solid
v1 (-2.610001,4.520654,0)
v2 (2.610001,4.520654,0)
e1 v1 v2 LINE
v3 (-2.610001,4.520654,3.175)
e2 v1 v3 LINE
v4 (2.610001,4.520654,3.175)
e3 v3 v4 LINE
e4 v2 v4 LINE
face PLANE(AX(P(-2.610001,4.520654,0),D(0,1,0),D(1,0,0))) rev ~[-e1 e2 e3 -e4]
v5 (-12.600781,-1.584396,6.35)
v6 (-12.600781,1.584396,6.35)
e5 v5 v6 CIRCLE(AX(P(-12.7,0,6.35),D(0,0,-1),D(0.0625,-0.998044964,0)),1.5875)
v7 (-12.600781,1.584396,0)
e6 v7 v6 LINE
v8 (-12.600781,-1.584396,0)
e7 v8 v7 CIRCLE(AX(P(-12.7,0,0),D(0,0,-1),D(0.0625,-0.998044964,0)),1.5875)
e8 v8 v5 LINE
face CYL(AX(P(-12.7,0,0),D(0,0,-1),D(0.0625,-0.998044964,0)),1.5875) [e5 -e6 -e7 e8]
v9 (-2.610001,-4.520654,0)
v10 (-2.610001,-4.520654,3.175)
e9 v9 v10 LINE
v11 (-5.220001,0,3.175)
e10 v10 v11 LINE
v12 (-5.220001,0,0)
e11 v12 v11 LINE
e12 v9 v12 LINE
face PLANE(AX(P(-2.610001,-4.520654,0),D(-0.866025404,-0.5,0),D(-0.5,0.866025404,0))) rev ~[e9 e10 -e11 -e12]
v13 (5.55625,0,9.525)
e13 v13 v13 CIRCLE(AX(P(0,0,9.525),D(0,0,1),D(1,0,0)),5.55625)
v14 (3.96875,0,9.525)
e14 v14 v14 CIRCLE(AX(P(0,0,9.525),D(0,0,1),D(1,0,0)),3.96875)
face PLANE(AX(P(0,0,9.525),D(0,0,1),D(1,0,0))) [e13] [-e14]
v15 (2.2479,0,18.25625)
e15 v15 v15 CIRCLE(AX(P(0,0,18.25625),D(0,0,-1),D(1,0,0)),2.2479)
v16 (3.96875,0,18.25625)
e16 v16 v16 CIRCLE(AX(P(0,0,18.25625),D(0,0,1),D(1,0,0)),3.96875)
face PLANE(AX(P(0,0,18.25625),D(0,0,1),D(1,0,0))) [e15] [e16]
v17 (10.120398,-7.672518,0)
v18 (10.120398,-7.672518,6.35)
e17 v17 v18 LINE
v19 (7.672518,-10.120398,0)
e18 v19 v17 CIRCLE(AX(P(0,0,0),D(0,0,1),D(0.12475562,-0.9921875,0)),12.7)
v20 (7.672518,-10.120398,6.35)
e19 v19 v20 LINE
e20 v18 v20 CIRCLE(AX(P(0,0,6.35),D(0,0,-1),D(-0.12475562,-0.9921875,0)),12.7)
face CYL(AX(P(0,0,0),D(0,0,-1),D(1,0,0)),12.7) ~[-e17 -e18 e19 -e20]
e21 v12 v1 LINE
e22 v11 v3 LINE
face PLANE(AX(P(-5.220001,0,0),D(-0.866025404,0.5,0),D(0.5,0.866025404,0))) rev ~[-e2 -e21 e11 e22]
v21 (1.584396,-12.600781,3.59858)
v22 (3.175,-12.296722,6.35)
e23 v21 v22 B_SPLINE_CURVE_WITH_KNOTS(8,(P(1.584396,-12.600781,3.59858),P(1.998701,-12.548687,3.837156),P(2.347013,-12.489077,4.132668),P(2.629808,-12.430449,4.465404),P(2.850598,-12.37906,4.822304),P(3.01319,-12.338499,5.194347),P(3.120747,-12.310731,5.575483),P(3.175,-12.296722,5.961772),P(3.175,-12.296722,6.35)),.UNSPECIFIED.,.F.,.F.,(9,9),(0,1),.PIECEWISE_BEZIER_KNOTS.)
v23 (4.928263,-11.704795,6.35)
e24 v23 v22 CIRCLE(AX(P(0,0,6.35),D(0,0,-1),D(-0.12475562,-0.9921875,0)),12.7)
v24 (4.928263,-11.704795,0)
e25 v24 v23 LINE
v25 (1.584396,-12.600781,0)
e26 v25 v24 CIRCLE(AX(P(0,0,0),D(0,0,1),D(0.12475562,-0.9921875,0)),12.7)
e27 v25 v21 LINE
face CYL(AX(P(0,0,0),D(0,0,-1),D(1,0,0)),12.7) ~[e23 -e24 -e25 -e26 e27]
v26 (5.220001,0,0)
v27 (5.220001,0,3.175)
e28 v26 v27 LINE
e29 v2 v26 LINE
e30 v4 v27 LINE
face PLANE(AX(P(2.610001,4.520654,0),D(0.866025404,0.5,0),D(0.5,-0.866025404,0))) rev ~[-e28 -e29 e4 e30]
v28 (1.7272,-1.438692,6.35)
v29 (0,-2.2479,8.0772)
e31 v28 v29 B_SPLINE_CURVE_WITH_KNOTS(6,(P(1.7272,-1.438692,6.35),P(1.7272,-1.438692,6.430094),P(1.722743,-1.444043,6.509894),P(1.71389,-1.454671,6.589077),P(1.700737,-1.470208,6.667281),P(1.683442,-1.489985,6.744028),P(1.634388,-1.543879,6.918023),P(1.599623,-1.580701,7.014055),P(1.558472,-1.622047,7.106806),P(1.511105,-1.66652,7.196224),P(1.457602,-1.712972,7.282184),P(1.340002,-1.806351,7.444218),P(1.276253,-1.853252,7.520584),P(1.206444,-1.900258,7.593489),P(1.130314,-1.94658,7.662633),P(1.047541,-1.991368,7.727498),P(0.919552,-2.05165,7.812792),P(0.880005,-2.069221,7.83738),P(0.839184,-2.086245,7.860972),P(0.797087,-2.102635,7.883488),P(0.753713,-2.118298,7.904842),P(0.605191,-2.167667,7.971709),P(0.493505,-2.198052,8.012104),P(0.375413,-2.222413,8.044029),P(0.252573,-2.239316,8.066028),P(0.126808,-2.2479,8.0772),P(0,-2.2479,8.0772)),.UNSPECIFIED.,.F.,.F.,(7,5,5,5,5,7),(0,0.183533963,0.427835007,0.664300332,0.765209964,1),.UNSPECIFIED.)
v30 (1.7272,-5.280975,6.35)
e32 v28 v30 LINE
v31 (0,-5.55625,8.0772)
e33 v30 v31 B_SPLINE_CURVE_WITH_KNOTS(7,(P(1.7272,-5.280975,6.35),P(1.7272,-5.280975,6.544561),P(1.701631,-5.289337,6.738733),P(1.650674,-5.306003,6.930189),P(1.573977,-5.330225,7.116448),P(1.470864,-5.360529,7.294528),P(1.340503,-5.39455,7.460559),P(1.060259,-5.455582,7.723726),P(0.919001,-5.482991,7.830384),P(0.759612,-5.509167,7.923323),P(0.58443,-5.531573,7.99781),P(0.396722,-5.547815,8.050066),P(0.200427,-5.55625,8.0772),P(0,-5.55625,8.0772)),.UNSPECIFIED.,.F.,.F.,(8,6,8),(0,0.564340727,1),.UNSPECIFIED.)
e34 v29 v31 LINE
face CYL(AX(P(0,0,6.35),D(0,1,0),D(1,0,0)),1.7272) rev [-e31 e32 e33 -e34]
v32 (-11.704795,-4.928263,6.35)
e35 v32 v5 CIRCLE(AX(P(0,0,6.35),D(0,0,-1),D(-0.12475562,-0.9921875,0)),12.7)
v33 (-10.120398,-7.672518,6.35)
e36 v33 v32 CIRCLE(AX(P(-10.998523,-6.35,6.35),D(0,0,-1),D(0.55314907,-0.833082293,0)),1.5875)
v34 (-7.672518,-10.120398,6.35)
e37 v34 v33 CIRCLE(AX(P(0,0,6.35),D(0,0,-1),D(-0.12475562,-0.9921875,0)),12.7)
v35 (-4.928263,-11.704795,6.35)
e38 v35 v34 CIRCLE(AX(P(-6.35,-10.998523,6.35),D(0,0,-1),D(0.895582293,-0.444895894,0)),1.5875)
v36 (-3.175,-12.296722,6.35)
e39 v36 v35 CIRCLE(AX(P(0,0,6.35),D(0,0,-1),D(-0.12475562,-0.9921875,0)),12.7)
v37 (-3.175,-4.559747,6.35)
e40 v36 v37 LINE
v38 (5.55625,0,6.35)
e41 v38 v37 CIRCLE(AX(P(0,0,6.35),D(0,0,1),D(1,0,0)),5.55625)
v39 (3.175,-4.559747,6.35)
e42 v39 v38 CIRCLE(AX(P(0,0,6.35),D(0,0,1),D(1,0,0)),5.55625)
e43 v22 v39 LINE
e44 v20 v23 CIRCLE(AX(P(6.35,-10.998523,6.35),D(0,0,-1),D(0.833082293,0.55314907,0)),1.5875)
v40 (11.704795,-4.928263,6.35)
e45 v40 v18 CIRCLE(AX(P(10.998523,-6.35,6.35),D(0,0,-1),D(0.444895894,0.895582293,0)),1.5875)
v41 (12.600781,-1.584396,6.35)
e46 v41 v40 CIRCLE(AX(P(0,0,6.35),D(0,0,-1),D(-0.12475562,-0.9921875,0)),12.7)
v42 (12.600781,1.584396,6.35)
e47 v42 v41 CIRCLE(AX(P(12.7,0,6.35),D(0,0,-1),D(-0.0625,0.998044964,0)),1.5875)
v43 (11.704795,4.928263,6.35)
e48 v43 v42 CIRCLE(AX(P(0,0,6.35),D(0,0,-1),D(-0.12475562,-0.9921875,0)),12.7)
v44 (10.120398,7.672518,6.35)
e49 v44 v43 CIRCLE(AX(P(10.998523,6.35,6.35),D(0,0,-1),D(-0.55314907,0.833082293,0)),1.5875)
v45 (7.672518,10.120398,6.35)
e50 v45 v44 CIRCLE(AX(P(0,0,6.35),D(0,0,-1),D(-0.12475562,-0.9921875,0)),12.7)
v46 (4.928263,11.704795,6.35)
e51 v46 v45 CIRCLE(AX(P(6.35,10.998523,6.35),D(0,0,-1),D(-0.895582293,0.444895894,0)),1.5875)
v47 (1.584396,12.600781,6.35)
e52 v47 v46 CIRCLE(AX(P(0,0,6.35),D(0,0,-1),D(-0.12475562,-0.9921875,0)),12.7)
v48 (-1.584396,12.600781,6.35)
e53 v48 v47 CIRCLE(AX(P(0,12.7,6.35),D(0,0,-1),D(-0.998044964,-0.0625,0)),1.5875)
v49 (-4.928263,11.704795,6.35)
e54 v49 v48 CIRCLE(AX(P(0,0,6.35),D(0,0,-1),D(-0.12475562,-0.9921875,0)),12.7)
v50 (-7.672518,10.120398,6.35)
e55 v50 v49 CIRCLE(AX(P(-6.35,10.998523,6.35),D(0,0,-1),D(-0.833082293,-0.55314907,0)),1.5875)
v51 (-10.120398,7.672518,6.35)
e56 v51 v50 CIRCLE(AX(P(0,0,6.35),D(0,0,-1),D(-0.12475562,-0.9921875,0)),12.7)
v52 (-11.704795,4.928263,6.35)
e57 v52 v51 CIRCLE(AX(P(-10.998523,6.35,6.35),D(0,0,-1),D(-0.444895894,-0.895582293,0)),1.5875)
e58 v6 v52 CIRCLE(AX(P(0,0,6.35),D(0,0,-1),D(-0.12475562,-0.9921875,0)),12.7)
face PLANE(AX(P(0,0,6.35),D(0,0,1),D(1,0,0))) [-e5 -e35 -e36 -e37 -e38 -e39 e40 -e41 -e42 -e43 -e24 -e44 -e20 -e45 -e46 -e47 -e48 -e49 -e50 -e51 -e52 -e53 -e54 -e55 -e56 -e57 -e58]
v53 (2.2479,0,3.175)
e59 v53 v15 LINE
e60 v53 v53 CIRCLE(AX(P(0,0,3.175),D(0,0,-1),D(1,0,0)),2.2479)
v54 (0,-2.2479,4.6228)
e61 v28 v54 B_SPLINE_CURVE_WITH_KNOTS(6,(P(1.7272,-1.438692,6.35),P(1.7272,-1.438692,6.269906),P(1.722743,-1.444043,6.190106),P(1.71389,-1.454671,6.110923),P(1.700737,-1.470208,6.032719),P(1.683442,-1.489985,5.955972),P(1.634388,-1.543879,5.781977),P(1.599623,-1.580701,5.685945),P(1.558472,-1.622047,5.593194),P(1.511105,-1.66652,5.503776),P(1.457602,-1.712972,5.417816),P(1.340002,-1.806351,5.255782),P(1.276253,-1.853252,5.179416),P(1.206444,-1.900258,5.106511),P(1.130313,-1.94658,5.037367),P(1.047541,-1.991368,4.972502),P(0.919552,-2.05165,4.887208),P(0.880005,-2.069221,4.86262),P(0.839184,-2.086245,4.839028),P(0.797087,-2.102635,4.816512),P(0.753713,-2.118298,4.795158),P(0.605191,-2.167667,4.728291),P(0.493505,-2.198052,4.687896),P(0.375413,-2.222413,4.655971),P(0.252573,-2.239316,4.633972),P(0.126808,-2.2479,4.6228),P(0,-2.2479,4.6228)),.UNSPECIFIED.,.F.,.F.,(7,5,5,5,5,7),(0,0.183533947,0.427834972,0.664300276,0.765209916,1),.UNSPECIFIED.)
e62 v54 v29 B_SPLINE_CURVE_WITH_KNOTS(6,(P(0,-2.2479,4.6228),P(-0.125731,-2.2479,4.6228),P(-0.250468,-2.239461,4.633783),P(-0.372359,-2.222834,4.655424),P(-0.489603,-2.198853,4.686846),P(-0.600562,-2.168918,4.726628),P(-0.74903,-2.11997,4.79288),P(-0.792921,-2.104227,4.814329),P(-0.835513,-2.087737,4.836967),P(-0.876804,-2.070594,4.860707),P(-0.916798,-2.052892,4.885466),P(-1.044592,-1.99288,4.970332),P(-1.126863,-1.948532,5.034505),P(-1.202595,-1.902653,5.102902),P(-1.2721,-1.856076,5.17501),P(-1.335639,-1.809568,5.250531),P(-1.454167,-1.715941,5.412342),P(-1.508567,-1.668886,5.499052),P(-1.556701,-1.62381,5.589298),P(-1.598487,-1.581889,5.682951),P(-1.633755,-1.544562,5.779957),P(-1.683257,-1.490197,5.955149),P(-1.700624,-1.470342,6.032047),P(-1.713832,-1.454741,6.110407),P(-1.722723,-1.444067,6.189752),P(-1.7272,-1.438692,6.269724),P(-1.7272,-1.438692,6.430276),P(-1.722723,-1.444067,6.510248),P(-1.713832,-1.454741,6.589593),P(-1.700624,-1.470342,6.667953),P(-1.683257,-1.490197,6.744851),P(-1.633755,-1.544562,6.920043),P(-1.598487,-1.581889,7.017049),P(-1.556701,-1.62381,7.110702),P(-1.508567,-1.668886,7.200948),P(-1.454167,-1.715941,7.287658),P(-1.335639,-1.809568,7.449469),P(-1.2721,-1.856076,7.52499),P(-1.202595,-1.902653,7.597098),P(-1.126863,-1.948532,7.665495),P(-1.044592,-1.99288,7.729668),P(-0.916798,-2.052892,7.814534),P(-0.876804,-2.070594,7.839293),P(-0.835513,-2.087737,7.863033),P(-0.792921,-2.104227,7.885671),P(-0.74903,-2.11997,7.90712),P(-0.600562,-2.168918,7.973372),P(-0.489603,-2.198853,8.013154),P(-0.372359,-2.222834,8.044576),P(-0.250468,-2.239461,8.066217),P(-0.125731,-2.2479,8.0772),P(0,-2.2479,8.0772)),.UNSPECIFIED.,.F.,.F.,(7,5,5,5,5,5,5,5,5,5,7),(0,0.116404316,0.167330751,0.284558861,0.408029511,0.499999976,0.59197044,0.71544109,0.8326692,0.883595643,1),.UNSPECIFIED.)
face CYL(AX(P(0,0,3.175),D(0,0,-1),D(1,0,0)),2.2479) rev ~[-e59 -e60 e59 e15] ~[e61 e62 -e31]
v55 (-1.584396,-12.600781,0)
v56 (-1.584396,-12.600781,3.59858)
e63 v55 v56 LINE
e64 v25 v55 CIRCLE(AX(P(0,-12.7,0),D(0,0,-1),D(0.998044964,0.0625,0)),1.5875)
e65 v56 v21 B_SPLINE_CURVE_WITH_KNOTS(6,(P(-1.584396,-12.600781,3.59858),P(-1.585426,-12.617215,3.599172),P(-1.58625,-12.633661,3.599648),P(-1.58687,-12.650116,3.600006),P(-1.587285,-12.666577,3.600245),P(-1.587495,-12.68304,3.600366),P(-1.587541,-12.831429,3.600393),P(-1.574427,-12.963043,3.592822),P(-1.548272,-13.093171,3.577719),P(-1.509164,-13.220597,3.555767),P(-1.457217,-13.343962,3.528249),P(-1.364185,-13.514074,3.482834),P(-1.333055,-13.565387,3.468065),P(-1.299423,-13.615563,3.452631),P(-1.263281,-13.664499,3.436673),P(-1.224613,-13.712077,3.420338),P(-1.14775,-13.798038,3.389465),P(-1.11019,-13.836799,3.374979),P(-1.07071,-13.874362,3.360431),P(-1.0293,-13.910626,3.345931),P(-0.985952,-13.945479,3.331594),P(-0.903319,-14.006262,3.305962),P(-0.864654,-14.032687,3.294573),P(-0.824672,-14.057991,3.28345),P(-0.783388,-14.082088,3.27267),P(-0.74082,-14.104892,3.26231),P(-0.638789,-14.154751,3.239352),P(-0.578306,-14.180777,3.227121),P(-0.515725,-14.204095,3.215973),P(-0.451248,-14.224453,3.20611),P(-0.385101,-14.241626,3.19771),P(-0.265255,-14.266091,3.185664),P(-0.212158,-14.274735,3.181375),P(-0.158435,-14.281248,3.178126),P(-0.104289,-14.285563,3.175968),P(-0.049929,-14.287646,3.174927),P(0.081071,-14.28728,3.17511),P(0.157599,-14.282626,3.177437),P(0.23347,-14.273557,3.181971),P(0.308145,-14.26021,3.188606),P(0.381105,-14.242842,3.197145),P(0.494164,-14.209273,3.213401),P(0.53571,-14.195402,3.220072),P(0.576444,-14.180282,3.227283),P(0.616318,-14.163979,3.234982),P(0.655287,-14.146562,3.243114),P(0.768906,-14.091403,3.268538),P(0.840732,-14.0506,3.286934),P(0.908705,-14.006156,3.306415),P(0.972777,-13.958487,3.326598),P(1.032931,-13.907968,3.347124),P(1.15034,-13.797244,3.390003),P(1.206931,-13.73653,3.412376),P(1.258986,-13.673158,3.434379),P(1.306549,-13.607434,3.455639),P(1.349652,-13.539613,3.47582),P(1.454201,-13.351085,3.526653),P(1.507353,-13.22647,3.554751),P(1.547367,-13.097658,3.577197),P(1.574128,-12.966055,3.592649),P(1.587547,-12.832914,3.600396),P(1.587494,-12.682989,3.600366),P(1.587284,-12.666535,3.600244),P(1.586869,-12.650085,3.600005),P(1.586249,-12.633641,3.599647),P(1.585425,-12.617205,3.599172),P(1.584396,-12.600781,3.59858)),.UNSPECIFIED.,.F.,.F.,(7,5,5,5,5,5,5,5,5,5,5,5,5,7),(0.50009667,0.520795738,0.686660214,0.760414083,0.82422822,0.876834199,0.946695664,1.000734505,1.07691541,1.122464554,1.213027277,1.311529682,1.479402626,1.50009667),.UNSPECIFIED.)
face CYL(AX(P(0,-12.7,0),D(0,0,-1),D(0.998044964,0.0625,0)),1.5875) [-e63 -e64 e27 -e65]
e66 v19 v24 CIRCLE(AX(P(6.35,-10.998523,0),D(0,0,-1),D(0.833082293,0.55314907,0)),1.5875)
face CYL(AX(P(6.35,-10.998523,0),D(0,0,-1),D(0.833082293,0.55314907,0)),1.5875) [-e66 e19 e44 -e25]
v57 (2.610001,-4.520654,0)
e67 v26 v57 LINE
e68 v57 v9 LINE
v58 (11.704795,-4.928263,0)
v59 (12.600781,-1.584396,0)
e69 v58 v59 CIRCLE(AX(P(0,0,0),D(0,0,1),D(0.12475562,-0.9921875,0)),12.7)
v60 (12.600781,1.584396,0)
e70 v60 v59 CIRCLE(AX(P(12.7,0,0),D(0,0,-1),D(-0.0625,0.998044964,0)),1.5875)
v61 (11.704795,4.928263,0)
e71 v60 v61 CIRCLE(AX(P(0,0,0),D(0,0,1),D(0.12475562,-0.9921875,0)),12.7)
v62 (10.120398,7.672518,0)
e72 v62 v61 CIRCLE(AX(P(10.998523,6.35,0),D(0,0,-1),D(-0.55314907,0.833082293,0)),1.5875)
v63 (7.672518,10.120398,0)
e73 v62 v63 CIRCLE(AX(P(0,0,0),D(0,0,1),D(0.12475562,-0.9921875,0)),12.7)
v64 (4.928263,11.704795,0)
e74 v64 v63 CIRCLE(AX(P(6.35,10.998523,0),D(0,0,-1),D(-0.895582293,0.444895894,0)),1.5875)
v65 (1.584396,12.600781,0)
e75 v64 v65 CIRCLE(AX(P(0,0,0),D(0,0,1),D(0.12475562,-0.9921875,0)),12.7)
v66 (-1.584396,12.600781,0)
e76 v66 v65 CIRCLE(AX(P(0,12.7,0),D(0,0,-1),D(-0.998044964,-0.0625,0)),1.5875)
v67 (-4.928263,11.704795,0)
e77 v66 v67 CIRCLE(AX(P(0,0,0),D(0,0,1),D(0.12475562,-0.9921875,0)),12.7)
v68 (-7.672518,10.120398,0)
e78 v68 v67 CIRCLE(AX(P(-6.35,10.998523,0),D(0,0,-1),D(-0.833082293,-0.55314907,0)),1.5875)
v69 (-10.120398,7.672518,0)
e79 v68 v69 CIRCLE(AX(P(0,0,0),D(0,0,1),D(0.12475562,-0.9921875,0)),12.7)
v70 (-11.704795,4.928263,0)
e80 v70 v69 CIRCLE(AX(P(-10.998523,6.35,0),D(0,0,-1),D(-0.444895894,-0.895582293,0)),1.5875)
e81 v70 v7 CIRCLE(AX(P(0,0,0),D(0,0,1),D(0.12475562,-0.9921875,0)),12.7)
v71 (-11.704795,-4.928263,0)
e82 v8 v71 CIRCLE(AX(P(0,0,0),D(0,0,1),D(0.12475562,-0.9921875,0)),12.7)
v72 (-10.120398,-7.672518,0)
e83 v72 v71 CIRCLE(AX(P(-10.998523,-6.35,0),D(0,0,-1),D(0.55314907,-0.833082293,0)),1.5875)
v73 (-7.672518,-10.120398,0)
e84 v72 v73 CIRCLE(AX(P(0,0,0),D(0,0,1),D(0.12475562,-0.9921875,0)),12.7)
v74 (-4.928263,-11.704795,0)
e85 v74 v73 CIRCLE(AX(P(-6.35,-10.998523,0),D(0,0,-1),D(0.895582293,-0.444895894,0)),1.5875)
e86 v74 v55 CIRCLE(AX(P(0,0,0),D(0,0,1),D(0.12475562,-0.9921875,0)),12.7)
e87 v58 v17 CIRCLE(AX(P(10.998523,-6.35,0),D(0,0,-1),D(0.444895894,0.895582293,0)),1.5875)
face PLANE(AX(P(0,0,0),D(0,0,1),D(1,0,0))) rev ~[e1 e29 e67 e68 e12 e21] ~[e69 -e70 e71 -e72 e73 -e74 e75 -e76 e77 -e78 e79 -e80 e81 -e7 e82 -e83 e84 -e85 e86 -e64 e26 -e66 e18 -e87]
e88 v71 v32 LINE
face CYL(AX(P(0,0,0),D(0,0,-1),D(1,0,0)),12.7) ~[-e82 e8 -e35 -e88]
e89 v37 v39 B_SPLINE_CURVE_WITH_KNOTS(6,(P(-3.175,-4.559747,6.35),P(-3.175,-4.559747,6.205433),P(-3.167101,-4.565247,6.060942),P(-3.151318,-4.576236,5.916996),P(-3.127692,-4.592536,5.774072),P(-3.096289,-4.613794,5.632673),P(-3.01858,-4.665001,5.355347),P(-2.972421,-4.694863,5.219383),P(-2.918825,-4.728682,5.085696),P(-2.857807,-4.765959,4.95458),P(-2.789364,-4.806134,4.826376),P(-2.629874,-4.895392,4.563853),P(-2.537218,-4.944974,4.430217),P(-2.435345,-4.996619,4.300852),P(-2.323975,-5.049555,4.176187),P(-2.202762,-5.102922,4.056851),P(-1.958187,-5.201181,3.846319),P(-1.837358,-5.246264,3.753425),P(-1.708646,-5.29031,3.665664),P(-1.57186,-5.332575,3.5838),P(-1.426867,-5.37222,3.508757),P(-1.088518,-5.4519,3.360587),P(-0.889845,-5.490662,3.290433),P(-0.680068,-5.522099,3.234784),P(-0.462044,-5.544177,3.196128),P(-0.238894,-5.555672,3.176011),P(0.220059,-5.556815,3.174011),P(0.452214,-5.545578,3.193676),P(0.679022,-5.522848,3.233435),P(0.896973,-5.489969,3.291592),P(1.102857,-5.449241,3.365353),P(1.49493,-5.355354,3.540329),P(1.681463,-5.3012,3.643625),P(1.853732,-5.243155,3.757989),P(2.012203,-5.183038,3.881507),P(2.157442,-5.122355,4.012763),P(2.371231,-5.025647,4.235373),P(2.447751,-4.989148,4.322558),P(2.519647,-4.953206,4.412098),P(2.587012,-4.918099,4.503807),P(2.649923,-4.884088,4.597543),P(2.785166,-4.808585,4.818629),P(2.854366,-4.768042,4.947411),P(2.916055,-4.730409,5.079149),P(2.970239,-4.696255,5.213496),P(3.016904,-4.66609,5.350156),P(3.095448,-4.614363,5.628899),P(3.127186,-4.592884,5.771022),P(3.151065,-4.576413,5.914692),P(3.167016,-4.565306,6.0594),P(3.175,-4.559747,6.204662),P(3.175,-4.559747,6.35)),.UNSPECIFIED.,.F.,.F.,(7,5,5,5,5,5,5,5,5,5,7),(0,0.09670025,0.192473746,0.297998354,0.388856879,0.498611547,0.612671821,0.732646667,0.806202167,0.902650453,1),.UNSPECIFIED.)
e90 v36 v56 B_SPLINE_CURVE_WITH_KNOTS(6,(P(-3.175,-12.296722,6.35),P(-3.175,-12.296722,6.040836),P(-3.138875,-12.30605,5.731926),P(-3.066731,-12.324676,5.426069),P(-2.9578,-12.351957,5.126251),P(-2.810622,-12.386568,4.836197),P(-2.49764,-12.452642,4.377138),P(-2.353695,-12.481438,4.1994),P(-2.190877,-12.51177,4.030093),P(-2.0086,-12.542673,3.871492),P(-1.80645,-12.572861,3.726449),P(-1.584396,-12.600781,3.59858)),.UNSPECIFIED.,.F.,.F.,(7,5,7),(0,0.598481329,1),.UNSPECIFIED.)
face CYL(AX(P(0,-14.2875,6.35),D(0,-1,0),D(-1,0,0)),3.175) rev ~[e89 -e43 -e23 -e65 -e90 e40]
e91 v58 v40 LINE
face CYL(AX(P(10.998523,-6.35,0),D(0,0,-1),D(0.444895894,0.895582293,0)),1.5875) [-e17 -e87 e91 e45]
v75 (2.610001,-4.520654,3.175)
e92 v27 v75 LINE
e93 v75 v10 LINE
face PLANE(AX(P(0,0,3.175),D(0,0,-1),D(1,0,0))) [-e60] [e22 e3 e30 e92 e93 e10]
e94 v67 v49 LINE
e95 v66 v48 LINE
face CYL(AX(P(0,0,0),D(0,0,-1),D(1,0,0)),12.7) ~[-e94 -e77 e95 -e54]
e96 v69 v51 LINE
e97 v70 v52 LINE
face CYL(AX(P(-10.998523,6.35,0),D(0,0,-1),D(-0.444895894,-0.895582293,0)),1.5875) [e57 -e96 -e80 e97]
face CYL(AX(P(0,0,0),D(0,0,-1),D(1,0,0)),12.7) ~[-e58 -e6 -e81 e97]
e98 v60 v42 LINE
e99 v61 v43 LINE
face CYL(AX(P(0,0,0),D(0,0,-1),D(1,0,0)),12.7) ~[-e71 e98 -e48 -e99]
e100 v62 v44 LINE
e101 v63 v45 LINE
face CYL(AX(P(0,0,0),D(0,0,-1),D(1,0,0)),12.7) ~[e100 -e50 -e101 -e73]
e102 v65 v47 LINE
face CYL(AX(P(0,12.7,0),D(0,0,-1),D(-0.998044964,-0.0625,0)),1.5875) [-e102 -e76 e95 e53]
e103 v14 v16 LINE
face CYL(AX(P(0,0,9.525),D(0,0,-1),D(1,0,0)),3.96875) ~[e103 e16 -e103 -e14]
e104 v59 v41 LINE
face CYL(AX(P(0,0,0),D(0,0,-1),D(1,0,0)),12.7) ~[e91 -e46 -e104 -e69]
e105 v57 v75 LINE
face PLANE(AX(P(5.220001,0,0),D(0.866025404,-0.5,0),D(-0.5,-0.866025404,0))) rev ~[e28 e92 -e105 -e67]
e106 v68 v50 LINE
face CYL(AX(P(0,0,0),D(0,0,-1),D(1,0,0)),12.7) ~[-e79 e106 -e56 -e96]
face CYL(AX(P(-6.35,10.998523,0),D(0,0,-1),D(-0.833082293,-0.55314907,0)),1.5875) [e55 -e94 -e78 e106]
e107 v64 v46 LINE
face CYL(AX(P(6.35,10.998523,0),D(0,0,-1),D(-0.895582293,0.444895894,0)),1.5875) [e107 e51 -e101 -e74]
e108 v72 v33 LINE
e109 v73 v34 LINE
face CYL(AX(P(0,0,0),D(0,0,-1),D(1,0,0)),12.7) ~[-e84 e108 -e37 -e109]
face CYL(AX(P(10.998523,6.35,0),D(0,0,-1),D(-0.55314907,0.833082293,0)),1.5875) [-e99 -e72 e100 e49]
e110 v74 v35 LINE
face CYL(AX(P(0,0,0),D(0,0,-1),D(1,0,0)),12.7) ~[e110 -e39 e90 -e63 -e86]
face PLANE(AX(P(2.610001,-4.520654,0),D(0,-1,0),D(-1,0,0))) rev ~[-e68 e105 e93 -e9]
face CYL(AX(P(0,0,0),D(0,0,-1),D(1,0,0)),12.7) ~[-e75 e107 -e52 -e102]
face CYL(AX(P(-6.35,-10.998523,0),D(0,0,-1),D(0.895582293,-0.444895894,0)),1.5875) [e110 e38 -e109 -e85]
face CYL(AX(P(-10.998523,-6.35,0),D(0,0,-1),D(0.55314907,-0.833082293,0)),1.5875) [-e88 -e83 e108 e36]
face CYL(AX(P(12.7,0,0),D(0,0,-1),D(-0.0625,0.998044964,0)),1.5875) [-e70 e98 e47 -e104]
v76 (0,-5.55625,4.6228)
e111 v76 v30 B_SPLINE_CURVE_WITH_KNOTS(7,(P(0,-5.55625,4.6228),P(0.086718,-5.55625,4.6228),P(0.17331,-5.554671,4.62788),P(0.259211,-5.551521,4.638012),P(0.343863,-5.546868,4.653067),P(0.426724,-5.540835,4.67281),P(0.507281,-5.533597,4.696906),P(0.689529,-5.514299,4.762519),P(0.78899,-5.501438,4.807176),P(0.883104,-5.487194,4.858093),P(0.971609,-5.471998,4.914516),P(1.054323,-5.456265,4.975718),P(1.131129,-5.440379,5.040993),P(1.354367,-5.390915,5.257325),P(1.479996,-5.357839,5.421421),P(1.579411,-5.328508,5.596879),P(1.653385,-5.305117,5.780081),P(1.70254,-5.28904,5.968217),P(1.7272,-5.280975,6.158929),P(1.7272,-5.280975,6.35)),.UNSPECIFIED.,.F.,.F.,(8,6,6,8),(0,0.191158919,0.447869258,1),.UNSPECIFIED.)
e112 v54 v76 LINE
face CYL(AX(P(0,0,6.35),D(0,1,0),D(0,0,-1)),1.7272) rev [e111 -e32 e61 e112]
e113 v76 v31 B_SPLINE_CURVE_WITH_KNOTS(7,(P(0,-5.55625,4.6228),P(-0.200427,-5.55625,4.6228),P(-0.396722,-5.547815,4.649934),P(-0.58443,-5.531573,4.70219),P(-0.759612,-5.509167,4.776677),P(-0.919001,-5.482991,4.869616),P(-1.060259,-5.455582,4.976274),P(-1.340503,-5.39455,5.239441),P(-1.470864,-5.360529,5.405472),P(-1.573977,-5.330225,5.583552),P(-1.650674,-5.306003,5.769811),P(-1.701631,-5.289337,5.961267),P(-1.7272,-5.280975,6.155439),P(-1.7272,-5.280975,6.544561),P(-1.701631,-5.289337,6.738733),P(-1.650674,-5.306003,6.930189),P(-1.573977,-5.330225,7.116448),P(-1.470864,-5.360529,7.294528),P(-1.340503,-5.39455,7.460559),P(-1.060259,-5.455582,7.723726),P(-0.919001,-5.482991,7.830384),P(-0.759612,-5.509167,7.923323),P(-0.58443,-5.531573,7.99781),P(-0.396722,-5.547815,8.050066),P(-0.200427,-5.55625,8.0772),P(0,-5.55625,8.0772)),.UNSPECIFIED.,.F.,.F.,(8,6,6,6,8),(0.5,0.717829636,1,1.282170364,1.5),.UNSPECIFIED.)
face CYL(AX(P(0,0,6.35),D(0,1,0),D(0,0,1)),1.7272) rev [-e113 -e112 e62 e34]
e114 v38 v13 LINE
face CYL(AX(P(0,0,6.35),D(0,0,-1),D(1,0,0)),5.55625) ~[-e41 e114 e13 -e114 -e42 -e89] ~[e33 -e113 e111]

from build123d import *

# Parameters (mm, degrees)
F0_R           = 12.7
F1_DEPTH       = 6.35
F3_DEPTH       = 3.175
F4_R           = 5.55625
F5_DEPTH       = 3.175
F6_R           = 3.96875
F7_DEPTH       = 8.73125
F8_R           = 2.2479
F9_DEPTH       = 15.08125
F11_DEPTH      = 6.35
F12_COUNT      = 12
F12_ANGLE      = 330
F14_END_RADIUS = 5.55625
F14_REACH      = 18.1506366107
F17_END_RADIUS = 5.55625
F17_REACH      = 35.6755158286


with BuildPart() as f1:
    # F0 (on Top) → F1 (new body)
    with BuildSketch(Plane.XY):
        Circle(F0_R)
    extrude(amount=F1_DEPTH)

    # F2 (on face) → F3 (cut)
    with BuildSketch(Plane(origin=(0, 0, 0), x_dir=(1, 0, 0), z_dir=(0, 0, -1))):
        Polygon((2.6100007461, 4.5206539), (-2.6100007461, 4.5206539), (-5.2200014922, 0), (-2.6100007461, -4.5206539), (2.6100007461, -4.5206539), (5.2200014922, 0), align=None)
    extrude(amount=-F3_DEPTH, mode=Mode.SUBTRACT)

    # F4 (on face) → F5 (join)
    with BuildSketch(Plane.XY.offset(6.35)):
        Circle(F4_R)
    extrude(amount=F5_DEPTH)

    # F6 (on face) → F7 (join)
    with BuildSketch(Plane.XY.offset(9.525)):
        Circle(F6_R)
    extrude(amount=F7_DEPTH)

    # F8 (on face) → F9 (cut, through all)
    with BuildSketch(Plane(origin=(0, 0, 3.175), x_dir=(1, 0, 0), z_dir=(0, 0, -1))):
        Circle(F8_R)
    extrude(amount=-F9_DEPTH, mode=Mode.SUBTRACT)

    # F10 (on face) → F11 (join, through all)
    with BuildSketch(Plane(origin=(0, 0, 0), x_dir=(1, 0, 0), z_dir=(0, 0, -1))):
        with BuildLine():
            ThreePointArc((-1.5843963802, 12.60078125), (0, 12.7), (1.5843963802, 12.60078125))
            ThreePointArc((1.5843963802, 12.60078125), (0, 14.2875), (-1.5843963802, 12.60078125))
        make_face()
    f11 = extrude(amount=-F11_DEPTH)

    # F12: F11 ×12 about axis
    f12_axis = Axis((0, 0, 0), (0, 0, -1))
    for i in range(1, F12_COUNT):
        add(f11.rotate(f12_axis, i * F12_ANGLE / (F12_COUNT - 1)))

    f14_end = (Plane(origin=(0, 0, 7.9375), x_dir=(-1, 0, 0), z_dir=(0, 0, -1)) * Cylinder(F14_END_RADIUS, 124.9884067655, mode=Mode.PRIVATE)).faces().sort_by_distance((-5.55625, 0, 7.9375))[0]
    # F13 (on Front) → F14 (cut, up to the whole of a round face its end follows)
    with BuildSketch(Plane.XZ):
        with BuildLine():
            ThreePointArc((0, 8.0772), (-1.7272, 6.35), (0, 4.6228))
            Line((0, 4.6228), (0, 8.0772))
        make_face()
        with BuildLine():
            Line((0, 8.0772), (0, 4.6228))
            ThreePointArc((0, 4.6228), (1.2213148325, 5.1286851675), (1.7272, 6.35))
            ThreePointArc((1.7272, 6.35), (1.2213148325, 7.5713148325), (0, 8.0772))
        make_face()
    f14_long = extrude(amount=F14_REACH, mode=Mode.PRIVATE)
    add(split(f14_long, bisect_by=f14_end, keep=Keep.BOTTOM, mode=Mode.PRIVATE), mode=Mode.SUBTRACT)

    f17_end = (Plane(origin=(0, 0, 7.9375), x_dir=(-1, 0, 0), z_dir=(0, 0, -1)) * Cylinder(F17_END_RADIUS, 160.0381652835, mode=Mode.PRIVATE)).faces().sort_by_distance((-5.55625, 0, 7.9375))[0]
    # F16 (on offset) → F17 (cut, up to the whole of a round face its end follows)
    with BuildSketch(Plane.XZ.offset(14.2875)):
        with BuildLine():
            Line((3.175, 6.35), (-3.175, 6.35))
            ThreePointArc((-3.175, 6.35), (0, 3.175), (3.175, 6.35))
        make_face()
    f17_long = extrude(amount=-F17_REACH, mode=Mode.PRIVATE)
    add(split(f17_long, bisect_by=f17_end, keep=Keep.ALL, mode=Mode.PRIVATE).solids().sort_by_distance((0, -14.2875, 5.0024881485))[0], mode=Mode.SUBTRACT)


solid = f1.part
